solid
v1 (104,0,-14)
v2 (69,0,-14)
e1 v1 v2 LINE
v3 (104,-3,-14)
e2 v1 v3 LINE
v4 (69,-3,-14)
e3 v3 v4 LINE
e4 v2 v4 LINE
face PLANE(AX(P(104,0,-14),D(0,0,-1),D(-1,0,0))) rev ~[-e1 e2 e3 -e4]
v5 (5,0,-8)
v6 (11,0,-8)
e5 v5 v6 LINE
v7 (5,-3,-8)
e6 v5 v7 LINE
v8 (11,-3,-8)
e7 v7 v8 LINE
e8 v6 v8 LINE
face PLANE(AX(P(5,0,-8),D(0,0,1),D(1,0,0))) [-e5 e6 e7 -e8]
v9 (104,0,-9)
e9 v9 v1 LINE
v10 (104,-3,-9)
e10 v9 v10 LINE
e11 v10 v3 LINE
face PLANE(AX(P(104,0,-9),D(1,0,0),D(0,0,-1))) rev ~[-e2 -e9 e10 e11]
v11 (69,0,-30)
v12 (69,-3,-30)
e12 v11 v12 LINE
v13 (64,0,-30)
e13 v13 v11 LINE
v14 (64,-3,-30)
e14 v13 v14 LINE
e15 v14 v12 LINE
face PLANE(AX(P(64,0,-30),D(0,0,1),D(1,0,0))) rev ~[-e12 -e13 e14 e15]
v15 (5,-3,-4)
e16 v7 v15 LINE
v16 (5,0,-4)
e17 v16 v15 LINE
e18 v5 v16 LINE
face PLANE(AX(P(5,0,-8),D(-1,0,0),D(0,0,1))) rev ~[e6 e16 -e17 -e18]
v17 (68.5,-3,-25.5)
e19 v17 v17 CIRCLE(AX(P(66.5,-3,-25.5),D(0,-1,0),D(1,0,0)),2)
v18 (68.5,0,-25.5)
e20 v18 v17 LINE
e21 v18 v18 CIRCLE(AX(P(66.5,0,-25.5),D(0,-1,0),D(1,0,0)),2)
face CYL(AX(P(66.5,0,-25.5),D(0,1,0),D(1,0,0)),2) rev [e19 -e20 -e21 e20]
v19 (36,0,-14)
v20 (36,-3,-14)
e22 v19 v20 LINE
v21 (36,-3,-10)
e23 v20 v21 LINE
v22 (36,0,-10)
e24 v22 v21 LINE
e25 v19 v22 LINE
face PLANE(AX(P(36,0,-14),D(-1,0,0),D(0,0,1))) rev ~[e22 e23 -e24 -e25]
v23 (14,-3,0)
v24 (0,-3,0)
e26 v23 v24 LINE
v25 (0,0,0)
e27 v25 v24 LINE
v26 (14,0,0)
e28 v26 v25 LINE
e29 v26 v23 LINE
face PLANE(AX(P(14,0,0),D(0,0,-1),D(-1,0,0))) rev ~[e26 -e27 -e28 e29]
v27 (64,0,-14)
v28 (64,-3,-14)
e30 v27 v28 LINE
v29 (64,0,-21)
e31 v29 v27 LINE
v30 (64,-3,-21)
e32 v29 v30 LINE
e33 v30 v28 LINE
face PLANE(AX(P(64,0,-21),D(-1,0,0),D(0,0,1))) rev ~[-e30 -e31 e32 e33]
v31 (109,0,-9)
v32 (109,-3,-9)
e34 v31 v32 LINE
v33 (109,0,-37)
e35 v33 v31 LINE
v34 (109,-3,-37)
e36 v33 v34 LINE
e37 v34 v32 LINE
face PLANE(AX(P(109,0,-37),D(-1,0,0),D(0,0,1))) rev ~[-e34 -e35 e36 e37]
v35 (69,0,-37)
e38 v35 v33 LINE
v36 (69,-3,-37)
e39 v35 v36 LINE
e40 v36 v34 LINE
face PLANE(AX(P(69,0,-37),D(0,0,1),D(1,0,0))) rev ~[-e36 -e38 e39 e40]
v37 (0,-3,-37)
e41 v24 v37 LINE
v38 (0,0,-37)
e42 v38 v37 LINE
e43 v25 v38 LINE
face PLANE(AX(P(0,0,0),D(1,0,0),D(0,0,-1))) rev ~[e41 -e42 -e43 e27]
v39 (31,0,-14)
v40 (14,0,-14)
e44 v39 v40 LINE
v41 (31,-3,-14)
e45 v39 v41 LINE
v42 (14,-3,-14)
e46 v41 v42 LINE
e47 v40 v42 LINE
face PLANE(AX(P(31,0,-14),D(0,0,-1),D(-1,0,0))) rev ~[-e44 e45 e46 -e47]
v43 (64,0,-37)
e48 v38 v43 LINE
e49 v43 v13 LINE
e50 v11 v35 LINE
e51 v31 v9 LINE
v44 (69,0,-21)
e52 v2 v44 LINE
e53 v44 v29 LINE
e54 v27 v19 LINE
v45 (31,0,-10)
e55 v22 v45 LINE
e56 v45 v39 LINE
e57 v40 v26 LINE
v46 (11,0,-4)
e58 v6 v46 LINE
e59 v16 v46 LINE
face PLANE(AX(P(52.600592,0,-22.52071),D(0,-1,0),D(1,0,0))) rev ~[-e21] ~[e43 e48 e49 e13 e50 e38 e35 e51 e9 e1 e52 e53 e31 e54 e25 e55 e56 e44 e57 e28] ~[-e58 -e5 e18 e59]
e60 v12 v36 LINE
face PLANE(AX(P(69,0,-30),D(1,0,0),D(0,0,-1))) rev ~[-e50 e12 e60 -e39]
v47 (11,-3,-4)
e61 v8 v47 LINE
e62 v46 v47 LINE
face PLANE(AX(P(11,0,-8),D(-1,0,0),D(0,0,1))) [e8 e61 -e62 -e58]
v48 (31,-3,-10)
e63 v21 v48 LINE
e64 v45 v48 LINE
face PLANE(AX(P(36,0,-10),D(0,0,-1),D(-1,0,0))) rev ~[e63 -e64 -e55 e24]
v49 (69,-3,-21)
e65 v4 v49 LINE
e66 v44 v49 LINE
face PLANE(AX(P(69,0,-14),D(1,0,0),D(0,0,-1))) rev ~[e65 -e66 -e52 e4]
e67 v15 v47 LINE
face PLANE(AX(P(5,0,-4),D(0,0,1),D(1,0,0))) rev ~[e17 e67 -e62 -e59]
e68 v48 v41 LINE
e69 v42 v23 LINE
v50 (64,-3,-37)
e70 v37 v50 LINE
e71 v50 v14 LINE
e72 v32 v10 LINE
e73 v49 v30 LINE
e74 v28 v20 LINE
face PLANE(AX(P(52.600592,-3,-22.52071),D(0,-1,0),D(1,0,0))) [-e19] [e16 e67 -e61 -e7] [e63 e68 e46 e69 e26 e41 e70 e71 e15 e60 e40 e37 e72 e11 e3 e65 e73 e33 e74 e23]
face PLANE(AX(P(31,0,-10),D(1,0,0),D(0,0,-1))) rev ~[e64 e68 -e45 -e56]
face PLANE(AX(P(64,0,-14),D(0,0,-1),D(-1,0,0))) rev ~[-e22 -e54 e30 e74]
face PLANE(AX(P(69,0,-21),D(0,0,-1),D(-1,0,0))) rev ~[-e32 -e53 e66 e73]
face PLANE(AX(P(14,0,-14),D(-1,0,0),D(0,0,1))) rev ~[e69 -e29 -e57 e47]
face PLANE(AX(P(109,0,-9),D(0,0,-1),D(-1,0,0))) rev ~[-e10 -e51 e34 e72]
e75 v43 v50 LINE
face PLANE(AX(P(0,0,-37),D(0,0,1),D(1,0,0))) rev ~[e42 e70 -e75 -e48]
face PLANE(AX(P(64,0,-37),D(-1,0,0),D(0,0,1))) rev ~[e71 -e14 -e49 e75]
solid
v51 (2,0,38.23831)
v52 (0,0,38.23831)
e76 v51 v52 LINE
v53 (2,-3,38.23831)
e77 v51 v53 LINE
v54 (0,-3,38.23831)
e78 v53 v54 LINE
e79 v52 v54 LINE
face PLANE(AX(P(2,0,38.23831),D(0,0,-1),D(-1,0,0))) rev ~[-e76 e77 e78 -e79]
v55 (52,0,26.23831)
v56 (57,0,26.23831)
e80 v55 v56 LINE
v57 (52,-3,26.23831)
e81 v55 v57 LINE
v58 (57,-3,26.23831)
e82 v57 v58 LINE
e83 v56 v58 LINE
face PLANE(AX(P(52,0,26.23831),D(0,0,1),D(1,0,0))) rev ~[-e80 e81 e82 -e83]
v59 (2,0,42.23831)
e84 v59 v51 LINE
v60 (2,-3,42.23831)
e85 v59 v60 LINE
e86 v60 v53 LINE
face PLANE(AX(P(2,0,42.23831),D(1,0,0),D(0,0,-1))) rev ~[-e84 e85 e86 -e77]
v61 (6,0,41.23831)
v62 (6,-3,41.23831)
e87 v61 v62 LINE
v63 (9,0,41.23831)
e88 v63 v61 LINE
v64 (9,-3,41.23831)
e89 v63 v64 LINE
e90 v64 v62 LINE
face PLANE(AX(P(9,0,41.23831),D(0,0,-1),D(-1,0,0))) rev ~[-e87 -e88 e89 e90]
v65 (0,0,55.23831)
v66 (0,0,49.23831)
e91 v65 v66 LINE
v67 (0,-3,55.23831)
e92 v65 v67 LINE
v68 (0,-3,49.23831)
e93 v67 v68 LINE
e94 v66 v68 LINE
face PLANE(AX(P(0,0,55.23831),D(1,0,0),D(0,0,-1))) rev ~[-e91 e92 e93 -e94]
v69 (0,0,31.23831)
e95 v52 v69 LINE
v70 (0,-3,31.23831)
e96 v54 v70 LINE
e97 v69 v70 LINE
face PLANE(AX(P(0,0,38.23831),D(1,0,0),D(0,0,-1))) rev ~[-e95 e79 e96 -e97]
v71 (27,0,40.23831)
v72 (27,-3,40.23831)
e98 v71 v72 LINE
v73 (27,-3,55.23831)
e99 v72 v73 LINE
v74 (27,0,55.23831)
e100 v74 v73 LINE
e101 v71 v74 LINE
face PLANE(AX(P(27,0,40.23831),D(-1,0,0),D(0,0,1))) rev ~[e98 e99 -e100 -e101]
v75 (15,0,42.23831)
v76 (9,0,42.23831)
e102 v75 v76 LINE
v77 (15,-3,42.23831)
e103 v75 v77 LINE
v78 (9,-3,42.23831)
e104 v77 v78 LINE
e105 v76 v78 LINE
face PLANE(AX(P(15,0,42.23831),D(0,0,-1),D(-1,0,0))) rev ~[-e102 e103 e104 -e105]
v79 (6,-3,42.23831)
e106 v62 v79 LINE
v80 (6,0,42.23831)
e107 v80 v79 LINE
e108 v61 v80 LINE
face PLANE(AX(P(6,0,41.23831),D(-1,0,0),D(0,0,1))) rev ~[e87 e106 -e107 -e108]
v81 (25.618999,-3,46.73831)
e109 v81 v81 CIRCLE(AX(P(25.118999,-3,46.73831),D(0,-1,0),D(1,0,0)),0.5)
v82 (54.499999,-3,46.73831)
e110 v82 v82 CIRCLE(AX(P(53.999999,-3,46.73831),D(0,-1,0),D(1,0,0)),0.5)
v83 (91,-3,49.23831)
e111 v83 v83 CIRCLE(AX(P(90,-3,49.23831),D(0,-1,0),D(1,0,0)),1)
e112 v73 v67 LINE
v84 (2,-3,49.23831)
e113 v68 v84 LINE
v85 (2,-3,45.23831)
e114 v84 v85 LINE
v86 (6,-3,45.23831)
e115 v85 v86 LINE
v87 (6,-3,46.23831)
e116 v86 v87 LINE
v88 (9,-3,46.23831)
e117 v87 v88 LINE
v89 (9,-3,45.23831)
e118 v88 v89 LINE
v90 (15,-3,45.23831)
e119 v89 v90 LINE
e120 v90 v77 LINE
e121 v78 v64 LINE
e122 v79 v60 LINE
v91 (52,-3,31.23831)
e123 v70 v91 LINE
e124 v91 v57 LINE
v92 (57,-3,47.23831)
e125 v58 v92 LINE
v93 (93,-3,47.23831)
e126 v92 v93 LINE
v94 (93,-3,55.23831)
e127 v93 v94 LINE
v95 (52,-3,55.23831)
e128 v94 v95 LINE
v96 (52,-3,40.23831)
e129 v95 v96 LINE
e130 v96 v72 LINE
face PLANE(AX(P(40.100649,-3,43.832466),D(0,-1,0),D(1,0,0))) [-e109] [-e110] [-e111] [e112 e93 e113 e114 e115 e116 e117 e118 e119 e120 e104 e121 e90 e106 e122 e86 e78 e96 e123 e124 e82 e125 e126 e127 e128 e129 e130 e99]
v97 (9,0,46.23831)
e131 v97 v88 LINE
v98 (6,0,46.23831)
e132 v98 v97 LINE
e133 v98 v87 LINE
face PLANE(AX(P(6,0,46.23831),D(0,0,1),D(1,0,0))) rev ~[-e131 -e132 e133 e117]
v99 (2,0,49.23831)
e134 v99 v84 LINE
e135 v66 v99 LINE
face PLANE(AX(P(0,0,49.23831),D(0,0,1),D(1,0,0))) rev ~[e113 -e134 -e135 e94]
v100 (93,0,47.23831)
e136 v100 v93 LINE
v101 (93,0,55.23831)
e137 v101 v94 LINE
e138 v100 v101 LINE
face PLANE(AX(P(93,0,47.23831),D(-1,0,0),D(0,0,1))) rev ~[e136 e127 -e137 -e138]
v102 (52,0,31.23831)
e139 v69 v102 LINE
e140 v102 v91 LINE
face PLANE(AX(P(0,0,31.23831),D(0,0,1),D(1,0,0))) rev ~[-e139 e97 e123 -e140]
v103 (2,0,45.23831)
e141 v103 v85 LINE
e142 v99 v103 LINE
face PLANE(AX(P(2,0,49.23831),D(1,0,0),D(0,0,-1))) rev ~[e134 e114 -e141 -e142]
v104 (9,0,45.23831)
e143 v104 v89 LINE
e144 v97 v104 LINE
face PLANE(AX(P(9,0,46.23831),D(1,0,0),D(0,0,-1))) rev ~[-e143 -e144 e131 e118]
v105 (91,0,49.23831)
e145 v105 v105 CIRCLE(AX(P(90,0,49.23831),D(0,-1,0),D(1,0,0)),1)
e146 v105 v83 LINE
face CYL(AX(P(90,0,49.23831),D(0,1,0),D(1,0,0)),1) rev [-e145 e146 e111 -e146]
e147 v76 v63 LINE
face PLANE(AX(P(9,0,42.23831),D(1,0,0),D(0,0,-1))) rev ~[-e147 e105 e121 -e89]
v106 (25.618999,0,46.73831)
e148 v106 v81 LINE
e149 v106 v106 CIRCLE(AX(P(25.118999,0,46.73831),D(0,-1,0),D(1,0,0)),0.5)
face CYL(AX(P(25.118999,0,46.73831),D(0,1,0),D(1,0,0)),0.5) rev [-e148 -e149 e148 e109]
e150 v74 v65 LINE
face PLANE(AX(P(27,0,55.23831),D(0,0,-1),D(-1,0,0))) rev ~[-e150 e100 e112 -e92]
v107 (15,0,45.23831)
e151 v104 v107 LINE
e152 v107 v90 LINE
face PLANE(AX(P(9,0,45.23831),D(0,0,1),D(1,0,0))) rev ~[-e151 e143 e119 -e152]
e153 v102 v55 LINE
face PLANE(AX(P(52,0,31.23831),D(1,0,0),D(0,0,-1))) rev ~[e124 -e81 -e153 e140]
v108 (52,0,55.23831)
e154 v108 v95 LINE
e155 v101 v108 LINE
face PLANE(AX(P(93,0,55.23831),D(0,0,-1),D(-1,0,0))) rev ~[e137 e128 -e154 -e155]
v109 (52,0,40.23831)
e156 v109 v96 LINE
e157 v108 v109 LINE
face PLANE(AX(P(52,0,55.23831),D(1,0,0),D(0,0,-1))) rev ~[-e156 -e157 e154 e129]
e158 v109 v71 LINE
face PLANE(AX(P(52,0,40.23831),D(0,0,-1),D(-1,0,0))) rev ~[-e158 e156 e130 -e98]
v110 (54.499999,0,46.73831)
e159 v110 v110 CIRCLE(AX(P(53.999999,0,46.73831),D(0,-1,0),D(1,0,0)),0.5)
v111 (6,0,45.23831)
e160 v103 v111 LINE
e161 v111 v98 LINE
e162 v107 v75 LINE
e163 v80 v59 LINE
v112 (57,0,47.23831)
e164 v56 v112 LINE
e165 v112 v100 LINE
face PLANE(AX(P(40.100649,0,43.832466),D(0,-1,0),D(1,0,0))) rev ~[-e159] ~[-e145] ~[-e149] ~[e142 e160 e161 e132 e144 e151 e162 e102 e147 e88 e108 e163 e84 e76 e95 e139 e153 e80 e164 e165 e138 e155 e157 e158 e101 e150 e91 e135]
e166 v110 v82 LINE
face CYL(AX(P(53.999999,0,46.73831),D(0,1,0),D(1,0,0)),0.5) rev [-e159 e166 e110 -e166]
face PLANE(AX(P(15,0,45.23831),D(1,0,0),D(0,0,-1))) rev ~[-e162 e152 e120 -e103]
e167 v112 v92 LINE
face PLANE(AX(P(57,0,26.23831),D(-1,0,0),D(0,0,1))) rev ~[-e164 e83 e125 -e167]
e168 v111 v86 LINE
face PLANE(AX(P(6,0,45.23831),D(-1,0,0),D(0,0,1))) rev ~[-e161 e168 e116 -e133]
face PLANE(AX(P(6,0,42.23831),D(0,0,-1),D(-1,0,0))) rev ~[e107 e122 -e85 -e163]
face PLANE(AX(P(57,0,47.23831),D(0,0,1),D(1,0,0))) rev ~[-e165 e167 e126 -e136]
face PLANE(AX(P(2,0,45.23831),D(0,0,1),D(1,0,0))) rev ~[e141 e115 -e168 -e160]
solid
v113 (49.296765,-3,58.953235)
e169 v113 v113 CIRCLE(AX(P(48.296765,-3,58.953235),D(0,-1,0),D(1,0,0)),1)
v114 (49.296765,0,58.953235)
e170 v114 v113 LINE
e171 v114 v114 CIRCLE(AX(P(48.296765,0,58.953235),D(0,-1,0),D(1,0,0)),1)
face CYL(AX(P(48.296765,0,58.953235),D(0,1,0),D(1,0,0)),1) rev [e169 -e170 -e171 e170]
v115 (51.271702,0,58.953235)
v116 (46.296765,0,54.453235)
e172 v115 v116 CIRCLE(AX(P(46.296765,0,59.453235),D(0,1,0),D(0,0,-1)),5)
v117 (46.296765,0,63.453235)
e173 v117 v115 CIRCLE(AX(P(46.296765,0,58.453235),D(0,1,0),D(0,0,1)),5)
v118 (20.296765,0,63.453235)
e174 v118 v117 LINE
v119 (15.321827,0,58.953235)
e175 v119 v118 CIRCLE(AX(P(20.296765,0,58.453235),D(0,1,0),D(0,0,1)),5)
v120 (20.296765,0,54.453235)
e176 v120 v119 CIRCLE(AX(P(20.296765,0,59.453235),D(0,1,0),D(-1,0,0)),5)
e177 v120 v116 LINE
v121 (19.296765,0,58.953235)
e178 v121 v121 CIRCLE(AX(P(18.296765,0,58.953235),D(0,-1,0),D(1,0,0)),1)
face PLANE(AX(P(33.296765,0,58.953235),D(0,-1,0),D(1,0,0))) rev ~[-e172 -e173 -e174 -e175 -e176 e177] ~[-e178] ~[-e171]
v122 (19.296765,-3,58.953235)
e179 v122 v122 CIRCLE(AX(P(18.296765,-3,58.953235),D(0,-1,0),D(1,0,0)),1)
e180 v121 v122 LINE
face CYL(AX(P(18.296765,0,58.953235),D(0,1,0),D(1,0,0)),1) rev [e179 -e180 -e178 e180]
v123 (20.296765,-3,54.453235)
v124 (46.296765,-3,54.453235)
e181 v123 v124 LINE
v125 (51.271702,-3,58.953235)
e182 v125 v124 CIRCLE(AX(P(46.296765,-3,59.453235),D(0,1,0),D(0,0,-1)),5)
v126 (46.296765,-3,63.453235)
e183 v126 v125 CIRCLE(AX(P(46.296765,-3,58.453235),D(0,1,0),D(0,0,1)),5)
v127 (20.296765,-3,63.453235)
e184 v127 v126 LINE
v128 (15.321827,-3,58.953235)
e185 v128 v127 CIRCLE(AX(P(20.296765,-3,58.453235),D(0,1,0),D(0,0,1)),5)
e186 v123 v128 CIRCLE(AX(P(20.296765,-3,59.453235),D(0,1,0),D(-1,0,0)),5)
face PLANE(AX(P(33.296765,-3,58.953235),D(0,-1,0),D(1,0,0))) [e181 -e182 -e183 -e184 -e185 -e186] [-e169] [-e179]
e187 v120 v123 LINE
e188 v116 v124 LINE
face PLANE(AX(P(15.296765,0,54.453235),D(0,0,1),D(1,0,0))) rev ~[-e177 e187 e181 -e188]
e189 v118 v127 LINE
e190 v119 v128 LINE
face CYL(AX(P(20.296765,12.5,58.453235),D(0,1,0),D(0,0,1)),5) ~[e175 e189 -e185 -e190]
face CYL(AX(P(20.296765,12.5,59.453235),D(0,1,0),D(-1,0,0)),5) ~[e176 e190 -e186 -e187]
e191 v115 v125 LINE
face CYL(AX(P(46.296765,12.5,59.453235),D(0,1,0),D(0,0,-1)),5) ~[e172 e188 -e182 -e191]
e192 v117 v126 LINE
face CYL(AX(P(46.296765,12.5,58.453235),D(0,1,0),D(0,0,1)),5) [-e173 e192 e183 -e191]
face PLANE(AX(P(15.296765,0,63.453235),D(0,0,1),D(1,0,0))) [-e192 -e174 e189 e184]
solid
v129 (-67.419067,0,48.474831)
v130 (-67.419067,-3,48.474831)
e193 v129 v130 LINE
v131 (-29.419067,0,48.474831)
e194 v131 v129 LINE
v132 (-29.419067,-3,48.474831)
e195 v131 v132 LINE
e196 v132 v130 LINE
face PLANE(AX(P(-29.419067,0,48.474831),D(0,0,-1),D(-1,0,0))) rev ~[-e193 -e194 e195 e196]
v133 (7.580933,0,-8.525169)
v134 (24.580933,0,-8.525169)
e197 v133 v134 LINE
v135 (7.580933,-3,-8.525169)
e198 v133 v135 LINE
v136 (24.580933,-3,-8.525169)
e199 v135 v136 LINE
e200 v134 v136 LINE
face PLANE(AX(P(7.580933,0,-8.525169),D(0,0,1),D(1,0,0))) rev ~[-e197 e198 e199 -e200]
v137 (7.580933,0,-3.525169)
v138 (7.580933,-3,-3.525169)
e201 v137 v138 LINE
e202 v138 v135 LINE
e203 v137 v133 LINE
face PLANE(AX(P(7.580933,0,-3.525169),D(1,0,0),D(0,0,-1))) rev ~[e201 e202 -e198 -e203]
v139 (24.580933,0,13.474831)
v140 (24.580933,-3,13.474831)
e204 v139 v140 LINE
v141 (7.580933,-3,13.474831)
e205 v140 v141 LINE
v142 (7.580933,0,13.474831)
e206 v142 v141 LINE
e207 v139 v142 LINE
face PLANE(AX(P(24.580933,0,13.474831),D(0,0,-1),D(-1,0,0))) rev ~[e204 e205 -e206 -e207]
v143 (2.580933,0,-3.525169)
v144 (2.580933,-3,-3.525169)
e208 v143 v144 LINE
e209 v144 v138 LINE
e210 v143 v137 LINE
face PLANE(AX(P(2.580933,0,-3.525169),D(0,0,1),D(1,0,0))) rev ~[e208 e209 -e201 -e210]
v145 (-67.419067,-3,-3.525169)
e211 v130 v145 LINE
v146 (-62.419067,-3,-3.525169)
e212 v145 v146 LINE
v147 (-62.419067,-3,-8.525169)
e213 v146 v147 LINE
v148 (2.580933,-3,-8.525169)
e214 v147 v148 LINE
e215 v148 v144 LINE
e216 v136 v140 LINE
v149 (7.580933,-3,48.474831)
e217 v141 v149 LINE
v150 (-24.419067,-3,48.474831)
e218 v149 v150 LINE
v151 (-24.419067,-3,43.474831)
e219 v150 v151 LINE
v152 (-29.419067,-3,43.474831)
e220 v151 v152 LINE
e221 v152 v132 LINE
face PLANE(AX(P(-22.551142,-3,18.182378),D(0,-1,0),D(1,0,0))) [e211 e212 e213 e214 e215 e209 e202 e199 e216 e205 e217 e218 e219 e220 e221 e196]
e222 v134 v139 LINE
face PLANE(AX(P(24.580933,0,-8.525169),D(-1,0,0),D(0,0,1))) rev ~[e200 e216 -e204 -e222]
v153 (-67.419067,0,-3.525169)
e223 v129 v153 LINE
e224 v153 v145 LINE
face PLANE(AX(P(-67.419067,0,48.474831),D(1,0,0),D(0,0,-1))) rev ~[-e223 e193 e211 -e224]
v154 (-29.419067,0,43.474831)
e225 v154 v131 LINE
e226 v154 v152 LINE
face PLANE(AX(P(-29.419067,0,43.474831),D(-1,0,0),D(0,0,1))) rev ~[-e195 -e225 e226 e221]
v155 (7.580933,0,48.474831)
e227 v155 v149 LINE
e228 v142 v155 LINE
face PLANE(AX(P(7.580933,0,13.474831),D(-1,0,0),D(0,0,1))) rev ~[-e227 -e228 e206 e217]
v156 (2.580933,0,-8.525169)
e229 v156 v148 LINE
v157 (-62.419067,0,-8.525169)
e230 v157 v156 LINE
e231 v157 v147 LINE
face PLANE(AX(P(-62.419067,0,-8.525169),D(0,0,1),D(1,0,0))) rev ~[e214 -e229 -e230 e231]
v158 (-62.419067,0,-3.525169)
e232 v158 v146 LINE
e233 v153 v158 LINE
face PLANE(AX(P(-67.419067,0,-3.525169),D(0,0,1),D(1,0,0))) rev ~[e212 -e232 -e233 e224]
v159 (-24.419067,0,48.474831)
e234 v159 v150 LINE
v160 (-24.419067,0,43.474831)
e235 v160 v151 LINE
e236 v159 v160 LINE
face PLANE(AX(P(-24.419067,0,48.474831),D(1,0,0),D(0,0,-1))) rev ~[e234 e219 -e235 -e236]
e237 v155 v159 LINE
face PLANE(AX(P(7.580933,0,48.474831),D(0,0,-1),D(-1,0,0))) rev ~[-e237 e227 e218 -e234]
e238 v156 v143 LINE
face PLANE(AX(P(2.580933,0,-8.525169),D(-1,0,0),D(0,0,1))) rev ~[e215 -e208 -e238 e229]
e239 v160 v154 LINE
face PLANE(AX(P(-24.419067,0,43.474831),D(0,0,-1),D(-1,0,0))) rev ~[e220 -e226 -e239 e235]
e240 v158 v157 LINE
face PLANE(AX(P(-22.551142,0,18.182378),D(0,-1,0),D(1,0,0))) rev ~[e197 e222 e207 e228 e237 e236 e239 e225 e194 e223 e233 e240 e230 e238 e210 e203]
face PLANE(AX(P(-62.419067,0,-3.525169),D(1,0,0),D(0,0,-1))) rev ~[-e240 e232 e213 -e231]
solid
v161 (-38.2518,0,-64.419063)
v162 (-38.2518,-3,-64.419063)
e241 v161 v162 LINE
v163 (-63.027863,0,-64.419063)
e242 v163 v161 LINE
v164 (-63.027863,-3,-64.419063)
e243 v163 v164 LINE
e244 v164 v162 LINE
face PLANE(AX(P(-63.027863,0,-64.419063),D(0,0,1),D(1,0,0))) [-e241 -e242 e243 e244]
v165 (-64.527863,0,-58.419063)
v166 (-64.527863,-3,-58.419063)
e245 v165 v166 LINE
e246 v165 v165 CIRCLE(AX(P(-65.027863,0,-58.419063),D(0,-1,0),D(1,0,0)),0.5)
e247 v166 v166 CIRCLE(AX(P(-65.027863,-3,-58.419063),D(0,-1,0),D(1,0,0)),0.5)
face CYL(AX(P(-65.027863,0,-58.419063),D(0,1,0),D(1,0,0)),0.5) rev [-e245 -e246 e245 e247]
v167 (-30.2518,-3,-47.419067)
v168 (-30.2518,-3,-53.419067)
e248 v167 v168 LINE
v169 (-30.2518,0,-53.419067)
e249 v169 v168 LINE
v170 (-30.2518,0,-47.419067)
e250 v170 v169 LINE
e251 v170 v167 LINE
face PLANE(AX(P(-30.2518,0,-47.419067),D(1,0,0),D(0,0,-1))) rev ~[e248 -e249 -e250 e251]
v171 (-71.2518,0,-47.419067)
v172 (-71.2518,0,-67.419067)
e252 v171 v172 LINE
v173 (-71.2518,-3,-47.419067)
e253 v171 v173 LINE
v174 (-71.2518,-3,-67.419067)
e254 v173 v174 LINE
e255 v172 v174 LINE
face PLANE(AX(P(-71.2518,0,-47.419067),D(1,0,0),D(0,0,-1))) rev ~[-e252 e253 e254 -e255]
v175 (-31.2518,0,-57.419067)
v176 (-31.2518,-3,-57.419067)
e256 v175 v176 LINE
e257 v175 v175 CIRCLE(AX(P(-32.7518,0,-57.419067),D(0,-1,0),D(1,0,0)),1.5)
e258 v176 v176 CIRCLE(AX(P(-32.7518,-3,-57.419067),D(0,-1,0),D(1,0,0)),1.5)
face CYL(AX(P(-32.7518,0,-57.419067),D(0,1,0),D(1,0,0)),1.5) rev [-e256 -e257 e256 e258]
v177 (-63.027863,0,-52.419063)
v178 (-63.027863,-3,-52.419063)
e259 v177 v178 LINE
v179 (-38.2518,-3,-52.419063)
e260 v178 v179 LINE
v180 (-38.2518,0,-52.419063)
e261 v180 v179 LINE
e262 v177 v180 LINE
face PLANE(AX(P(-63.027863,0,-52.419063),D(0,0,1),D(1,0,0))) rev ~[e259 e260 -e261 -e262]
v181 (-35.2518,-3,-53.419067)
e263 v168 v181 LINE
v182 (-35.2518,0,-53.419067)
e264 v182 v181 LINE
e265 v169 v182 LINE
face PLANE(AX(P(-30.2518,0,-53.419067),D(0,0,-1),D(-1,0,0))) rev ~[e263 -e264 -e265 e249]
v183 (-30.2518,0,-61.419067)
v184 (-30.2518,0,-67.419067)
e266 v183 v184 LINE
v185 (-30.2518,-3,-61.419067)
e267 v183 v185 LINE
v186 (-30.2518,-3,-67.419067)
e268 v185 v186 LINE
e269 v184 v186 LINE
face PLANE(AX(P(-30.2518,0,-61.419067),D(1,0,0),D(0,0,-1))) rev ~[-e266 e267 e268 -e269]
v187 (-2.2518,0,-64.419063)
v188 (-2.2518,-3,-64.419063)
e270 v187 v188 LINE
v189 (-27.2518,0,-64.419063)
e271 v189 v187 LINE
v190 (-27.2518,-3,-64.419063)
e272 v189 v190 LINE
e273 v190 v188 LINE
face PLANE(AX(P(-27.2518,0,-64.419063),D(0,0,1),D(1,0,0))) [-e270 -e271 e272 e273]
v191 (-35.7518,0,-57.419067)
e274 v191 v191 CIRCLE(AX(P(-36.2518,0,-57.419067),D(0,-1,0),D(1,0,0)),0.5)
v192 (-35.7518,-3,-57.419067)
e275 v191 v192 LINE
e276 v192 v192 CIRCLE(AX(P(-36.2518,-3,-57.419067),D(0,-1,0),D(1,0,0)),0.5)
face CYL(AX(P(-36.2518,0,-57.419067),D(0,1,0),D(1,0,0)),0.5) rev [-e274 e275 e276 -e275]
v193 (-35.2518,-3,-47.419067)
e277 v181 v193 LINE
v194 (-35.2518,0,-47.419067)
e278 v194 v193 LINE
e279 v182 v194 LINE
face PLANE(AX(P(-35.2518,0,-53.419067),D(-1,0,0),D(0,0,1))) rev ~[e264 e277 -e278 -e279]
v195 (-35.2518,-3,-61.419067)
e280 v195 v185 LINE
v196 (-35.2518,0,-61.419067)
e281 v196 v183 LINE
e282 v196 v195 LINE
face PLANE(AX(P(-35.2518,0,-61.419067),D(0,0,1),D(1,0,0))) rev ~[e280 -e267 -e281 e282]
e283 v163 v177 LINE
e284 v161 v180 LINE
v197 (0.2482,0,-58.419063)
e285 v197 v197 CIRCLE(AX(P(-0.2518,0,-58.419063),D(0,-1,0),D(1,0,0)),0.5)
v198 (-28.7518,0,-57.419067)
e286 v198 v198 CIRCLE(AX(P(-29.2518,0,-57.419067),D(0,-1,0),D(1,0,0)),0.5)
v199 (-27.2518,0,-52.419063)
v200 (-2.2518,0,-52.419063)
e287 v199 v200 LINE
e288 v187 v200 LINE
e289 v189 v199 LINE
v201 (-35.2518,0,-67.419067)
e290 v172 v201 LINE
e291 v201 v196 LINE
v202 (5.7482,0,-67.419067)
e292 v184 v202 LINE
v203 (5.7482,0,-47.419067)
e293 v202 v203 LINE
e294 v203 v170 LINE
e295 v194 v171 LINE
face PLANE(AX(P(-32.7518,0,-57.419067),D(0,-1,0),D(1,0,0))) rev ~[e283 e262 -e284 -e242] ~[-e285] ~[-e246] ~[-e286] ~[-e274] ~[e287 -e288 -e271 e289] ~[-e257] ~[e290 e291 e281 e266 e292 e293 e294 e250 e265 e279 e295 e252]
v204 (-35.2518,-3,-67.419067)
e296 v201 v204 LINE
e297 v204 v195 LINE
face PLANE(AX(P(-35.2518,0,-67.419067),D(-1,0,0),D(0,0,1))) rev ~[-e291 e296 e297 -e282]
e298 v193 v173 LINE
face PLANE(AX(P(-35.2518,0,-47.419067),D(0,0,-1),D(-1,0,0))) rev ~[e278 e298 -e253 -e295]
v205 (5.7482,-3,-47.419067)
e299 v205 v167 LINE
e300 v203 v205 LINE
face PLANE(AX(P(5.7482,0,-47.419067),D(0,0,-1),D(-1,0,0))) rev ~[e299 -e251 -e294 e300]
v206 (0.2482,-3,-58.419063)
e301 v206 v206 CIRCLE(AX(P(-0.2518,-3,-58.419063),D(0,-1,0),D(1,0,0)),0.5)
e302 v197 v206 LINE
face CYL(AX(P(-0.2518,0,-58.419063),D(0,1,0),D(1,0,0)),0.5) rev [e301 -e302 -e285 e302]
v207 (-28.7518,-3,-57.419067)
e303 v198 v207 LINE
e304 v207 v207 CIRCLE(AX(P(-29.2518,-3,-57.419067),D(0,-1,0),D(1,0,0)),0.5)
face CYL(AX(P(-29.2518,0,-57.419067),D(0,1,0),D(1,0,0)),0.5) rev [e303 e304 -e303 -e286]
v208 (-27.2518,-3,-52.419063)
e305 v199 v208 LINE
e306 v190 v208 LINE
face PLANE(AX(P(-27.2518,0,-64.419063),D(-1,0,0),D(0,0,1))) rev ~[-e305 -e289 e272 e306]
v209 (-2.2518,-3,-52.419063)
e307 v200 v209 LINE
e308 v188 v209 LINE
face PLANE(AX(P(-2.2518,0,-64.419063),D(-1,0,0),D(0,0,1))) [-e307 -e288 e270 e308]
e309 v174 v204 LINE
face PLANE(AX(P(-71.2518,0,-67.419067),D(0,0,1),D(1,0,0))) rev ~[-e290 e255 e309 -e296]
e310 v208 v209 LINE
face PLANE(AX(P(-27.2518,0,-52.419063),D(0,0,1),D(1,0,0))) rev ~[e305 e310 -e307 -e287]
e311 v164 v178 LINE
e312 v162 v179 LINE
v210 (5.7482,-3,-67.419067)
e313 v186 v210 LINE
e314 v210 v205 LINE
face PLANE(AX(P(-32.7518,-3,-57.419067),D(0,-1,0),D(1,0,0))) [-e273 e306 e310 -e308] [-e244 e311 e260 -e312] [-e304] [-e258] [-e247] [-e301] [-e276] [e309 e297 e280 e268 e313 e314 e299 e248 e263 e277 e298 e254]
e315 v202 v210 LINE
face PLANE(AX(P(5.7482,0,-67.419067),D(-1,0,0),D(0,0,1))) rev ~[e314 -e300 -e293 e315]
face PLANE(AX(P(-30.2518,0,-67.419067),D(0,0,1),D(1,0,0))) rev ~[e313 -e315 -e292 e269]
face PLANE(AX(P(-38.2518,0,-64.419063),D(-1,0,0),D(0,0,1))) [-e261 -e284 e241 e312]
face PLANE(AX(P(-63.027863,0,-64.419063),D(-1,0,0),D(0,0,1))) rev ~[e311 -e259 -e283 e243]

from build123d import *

# Parameters (mm, degrees)
F1_DEPTH    = 3
F2_R        = 2
F2_W        = 6
F2_H        = 4
F3_DEPTH    = 3
F4_R        = 0.5
F4_W        = 24.7760626674
F4_H        = 12
F4_R_2      = 1.5
F4_W_2      = 25
F5_DEPTH    = 3
F6_W        = 36
F6_H        = 9
F6_R        = 1
F7_DEPTH    = 3
F8_T1_DEPTH = 28
F9_R        = 0.5
F9_R_2      = 1
F10_DEPTH   = 3


# Not quite as in the source:
# - a fillet or chamfer that OpenCascade refuses, or shapes differently, is made with other operations: its cross-section is extruded or revolved along the edge and cut away or added


with BuildPart() as f1:
    # F0 (on Front) → F1 (new body)
    with BuildSketch(Plane.XZ):
        Polygon((-29.4190670252, 48.4748313129), (-67.4190670252, 48.4748313129), (-67.4190670252, -3.5251686871), (-62.4190670252, -3.5251686871), (-62.4190670252, -8.5251686871), (2.5809329748, -8.5251686871), (2.5809329748, -3.5251686871), (7.5809329748, -3.5251686871), (7.5809329748, -8.5251686871), (24.5809329748, -8.5251686871), (24.5809329748, 13.4748313129), (7.5809329748, 13.4748313129), (7.5809329748, 48.4748313129), (-24.4190670252, 48.4748313129), (-24.4190670252, 43.4748313129), (-29.4190670252, 43.4748313129), align=None)
    extrude(amount=F1_DEPTH)


with BuildPart() as f3:
    # F2 (on Front) → F3 (new body)
    with BuildSketch(Plane.XZ):
        Polygon((14, 0), (0, 0), (0, -37), (64, -37), (64, -30), (69, -30), (69, -37), (109, -37), (109, -9), (104, -9), (104, -14), (69, -14), (69, -21), (64, -21), (64, -14), (36, -14), (36, -10), (31, -10), (31, -14), (14, -14), align=None)
        with Locations((66.5, -25.5)):
            Circle(F2_R, mode=Mode.SUBTRACT)
        with Locations((8, -6)):
            Rectangle(F2_W, F2_H, mode=Mode.SUBTRACT)
    extrude(amount=F3_DEPTH)


with BuildPart() as f5:
    # F4 (on Front) → F5 (new body)
    with BuildSketch(Plane.XZ):
        Polygon((-71.2518001199, -47.4190670252), (-71.2518001199, -67.4190670252), (-35.2518001199, -67.4190670252), (-35.2518001199, -61.4190670252), (-30.2518001199, -61.4190670252), (-30.2518001199, -67.4190670252), (5.7481998801, -67.4190670252), (5.7481998801, -47.4190670252), (-30.2518001199, -47.4190670252), (-30.2518001199, -53.4190670252), (-35.2518001199, -53.4190670252), (-35.2518001199, -47.4190670252), align=None)
        with Locations((-65.0278627872, -58.4190629094)):
            Circle(F4_R, mode=Mode.SUBTRACT)
        with Locations((-50.6398314536, -58.4190629094)):
            Rectangle(F4_W, F4_H, mode=Mode.SUBTRACT)
        with Locations((-36.2518001199, -57.4190670252)):
            Circle(F4_R, mode=Mode.SUBTRACT)
        with Locations((-32.7518001199, -57.4190670252)):
            Circle(F4_R_2, mode=Mode.SUBTRACT)
        with Locations((-29.2518001199, -57.4190670252)):
            Circle(F4_R, mode=Mode.SUBTRACT)
        with Locations((-14.7518001199, -58.4190629094)):
            Rectangle(F4_W_2, F4_H, mode=Mode.SUBTRACT)
        with Locations((-0.2518001199, -58.4190629094)):
            Circle(F4_R, mode=Mode.SUBTRACT)
    extrude(amount=F5_DEPTH)


with BuildPart() as f7:
    # F6 (on Front) → F7 (new body)
    with BuildSketch(Plane.XZ):
        with Locations((33.2967646718, 58.9532347322)):
            Rectangle(F6_W, F6_H)
        with Locations((18.2967646718, 58.9532347322)):
            Circle(F6_R, mode=Mode.SUBTRACT)
        with Locations((48.2967646718, 58.9532347322)):
            Circle(F6_R, mode=Mode.SUBTRACT)
    extrude(amount=F7_DEPTH)

    # F8: fillet of radius 5 on 4 edges, made by hand

    # F8_s2 → F8_t1 (cut)
    with BuildSketch(Plane.XZ.offset(-12.5)):
        with BuildLine():
            ThreePointArc((20.2967646718, 63.4532347322), (16.7612307659, 61.9887686381), (15.2967646718, 58.4532347322))
            Line((15.2967646718, 58.4532347322), (15.2967646718, 63.4532347322))
            Line((15.2967646718, 63.4532347322), (20.2967646718, 63.4532347322))
        make_face()
        with BuildLine():
            ThreePointArc((15.2967646718, 59.4532347322), (16.7612307659, 55.9177008262), (20.2967646718, 54.4532347322))
            Line((20.2967646718, 54.4532347322), (15.2967646718, 54.4532347322))
            Line((15.2967646718, 54.4532347322), (15.2967646718, 59.4532347322))
        make_face()
        with BuildLine():
            ThreePointArc((46.2967646718, 63.4532347322), (49.8322985777, 61.9887686381), (51.2967646718, 58.4532347322))
            Line((51.2967646718, 58.4532347322), (51.2967646718, 63.4532347322))
            Line((51.2967646718, 63.4532347322), (46.2967646718, 63.4532347322))
        make_face()
        with BuildLine():
            ThreePointArc((46.2967646718, 54.4532347322), (49.8322985777, 55.9177008262), (51.2967646718, 59.4532347322))
            Line((51.2967646718, 59.4532347322), (51.2967646718, 54.4532347322))
            Line((51.2967646718, 54.4532347322), (46.2967646718, 54.4532347322))
        make_face()
    extrude(amount=F8_T1_DEPTH, mode=Mode.SUBTRACT)


with BuildPart() as f10:
    # F9 (on Front) → F10 (new body)
    with BuildSketch(Plane.XZ):
        Polygon((27, 55.2383102477), (0, 55.2383102477), (0, 49.2383102477), (2, 49.2383102477), (2, 45.2383102477), (6, 45.2383102477), (6, 46.2383102477), (9, 46.2383102477), (9, 45.2383102477), (15, 45.2383102477), (15, 42.2383102477), (9, 42.2383102477), (9, 41.2383102477), (6, 41.2383102477), (6, 42.2383102477), (2, 42.2383102477), (2, 38.2383102477), (0, 38.2383102477), (0, 31.2383102477), (52, 31.2383102477), (52, 26.2383102477), (57, 26.2383102477), (57, 47.2383102477), (93, 47.2383102477), (93, 55.2383102477), (52, 55.2383102477), (52, 40.2383102477), (27, 40.2383102477), align=None)
        with Locations((25.1189991832, 46.7383102477)):
            Circle(F9_R, mode=Mode.SUBTRACT)
        with Locations((53.9999991832, 46.7383102477)):
            Circle(F9_R, mode=Mode.SUBTRACT)
        with Locations((90, 49.2383102477)):
            Circle(F9_R_2, mode=Mode.SUBTRACT)
    extrude(amount=F10_DEPTH)


solid = Compound([f1.part, f3.part, f5.part, f7.part, f10.part])
